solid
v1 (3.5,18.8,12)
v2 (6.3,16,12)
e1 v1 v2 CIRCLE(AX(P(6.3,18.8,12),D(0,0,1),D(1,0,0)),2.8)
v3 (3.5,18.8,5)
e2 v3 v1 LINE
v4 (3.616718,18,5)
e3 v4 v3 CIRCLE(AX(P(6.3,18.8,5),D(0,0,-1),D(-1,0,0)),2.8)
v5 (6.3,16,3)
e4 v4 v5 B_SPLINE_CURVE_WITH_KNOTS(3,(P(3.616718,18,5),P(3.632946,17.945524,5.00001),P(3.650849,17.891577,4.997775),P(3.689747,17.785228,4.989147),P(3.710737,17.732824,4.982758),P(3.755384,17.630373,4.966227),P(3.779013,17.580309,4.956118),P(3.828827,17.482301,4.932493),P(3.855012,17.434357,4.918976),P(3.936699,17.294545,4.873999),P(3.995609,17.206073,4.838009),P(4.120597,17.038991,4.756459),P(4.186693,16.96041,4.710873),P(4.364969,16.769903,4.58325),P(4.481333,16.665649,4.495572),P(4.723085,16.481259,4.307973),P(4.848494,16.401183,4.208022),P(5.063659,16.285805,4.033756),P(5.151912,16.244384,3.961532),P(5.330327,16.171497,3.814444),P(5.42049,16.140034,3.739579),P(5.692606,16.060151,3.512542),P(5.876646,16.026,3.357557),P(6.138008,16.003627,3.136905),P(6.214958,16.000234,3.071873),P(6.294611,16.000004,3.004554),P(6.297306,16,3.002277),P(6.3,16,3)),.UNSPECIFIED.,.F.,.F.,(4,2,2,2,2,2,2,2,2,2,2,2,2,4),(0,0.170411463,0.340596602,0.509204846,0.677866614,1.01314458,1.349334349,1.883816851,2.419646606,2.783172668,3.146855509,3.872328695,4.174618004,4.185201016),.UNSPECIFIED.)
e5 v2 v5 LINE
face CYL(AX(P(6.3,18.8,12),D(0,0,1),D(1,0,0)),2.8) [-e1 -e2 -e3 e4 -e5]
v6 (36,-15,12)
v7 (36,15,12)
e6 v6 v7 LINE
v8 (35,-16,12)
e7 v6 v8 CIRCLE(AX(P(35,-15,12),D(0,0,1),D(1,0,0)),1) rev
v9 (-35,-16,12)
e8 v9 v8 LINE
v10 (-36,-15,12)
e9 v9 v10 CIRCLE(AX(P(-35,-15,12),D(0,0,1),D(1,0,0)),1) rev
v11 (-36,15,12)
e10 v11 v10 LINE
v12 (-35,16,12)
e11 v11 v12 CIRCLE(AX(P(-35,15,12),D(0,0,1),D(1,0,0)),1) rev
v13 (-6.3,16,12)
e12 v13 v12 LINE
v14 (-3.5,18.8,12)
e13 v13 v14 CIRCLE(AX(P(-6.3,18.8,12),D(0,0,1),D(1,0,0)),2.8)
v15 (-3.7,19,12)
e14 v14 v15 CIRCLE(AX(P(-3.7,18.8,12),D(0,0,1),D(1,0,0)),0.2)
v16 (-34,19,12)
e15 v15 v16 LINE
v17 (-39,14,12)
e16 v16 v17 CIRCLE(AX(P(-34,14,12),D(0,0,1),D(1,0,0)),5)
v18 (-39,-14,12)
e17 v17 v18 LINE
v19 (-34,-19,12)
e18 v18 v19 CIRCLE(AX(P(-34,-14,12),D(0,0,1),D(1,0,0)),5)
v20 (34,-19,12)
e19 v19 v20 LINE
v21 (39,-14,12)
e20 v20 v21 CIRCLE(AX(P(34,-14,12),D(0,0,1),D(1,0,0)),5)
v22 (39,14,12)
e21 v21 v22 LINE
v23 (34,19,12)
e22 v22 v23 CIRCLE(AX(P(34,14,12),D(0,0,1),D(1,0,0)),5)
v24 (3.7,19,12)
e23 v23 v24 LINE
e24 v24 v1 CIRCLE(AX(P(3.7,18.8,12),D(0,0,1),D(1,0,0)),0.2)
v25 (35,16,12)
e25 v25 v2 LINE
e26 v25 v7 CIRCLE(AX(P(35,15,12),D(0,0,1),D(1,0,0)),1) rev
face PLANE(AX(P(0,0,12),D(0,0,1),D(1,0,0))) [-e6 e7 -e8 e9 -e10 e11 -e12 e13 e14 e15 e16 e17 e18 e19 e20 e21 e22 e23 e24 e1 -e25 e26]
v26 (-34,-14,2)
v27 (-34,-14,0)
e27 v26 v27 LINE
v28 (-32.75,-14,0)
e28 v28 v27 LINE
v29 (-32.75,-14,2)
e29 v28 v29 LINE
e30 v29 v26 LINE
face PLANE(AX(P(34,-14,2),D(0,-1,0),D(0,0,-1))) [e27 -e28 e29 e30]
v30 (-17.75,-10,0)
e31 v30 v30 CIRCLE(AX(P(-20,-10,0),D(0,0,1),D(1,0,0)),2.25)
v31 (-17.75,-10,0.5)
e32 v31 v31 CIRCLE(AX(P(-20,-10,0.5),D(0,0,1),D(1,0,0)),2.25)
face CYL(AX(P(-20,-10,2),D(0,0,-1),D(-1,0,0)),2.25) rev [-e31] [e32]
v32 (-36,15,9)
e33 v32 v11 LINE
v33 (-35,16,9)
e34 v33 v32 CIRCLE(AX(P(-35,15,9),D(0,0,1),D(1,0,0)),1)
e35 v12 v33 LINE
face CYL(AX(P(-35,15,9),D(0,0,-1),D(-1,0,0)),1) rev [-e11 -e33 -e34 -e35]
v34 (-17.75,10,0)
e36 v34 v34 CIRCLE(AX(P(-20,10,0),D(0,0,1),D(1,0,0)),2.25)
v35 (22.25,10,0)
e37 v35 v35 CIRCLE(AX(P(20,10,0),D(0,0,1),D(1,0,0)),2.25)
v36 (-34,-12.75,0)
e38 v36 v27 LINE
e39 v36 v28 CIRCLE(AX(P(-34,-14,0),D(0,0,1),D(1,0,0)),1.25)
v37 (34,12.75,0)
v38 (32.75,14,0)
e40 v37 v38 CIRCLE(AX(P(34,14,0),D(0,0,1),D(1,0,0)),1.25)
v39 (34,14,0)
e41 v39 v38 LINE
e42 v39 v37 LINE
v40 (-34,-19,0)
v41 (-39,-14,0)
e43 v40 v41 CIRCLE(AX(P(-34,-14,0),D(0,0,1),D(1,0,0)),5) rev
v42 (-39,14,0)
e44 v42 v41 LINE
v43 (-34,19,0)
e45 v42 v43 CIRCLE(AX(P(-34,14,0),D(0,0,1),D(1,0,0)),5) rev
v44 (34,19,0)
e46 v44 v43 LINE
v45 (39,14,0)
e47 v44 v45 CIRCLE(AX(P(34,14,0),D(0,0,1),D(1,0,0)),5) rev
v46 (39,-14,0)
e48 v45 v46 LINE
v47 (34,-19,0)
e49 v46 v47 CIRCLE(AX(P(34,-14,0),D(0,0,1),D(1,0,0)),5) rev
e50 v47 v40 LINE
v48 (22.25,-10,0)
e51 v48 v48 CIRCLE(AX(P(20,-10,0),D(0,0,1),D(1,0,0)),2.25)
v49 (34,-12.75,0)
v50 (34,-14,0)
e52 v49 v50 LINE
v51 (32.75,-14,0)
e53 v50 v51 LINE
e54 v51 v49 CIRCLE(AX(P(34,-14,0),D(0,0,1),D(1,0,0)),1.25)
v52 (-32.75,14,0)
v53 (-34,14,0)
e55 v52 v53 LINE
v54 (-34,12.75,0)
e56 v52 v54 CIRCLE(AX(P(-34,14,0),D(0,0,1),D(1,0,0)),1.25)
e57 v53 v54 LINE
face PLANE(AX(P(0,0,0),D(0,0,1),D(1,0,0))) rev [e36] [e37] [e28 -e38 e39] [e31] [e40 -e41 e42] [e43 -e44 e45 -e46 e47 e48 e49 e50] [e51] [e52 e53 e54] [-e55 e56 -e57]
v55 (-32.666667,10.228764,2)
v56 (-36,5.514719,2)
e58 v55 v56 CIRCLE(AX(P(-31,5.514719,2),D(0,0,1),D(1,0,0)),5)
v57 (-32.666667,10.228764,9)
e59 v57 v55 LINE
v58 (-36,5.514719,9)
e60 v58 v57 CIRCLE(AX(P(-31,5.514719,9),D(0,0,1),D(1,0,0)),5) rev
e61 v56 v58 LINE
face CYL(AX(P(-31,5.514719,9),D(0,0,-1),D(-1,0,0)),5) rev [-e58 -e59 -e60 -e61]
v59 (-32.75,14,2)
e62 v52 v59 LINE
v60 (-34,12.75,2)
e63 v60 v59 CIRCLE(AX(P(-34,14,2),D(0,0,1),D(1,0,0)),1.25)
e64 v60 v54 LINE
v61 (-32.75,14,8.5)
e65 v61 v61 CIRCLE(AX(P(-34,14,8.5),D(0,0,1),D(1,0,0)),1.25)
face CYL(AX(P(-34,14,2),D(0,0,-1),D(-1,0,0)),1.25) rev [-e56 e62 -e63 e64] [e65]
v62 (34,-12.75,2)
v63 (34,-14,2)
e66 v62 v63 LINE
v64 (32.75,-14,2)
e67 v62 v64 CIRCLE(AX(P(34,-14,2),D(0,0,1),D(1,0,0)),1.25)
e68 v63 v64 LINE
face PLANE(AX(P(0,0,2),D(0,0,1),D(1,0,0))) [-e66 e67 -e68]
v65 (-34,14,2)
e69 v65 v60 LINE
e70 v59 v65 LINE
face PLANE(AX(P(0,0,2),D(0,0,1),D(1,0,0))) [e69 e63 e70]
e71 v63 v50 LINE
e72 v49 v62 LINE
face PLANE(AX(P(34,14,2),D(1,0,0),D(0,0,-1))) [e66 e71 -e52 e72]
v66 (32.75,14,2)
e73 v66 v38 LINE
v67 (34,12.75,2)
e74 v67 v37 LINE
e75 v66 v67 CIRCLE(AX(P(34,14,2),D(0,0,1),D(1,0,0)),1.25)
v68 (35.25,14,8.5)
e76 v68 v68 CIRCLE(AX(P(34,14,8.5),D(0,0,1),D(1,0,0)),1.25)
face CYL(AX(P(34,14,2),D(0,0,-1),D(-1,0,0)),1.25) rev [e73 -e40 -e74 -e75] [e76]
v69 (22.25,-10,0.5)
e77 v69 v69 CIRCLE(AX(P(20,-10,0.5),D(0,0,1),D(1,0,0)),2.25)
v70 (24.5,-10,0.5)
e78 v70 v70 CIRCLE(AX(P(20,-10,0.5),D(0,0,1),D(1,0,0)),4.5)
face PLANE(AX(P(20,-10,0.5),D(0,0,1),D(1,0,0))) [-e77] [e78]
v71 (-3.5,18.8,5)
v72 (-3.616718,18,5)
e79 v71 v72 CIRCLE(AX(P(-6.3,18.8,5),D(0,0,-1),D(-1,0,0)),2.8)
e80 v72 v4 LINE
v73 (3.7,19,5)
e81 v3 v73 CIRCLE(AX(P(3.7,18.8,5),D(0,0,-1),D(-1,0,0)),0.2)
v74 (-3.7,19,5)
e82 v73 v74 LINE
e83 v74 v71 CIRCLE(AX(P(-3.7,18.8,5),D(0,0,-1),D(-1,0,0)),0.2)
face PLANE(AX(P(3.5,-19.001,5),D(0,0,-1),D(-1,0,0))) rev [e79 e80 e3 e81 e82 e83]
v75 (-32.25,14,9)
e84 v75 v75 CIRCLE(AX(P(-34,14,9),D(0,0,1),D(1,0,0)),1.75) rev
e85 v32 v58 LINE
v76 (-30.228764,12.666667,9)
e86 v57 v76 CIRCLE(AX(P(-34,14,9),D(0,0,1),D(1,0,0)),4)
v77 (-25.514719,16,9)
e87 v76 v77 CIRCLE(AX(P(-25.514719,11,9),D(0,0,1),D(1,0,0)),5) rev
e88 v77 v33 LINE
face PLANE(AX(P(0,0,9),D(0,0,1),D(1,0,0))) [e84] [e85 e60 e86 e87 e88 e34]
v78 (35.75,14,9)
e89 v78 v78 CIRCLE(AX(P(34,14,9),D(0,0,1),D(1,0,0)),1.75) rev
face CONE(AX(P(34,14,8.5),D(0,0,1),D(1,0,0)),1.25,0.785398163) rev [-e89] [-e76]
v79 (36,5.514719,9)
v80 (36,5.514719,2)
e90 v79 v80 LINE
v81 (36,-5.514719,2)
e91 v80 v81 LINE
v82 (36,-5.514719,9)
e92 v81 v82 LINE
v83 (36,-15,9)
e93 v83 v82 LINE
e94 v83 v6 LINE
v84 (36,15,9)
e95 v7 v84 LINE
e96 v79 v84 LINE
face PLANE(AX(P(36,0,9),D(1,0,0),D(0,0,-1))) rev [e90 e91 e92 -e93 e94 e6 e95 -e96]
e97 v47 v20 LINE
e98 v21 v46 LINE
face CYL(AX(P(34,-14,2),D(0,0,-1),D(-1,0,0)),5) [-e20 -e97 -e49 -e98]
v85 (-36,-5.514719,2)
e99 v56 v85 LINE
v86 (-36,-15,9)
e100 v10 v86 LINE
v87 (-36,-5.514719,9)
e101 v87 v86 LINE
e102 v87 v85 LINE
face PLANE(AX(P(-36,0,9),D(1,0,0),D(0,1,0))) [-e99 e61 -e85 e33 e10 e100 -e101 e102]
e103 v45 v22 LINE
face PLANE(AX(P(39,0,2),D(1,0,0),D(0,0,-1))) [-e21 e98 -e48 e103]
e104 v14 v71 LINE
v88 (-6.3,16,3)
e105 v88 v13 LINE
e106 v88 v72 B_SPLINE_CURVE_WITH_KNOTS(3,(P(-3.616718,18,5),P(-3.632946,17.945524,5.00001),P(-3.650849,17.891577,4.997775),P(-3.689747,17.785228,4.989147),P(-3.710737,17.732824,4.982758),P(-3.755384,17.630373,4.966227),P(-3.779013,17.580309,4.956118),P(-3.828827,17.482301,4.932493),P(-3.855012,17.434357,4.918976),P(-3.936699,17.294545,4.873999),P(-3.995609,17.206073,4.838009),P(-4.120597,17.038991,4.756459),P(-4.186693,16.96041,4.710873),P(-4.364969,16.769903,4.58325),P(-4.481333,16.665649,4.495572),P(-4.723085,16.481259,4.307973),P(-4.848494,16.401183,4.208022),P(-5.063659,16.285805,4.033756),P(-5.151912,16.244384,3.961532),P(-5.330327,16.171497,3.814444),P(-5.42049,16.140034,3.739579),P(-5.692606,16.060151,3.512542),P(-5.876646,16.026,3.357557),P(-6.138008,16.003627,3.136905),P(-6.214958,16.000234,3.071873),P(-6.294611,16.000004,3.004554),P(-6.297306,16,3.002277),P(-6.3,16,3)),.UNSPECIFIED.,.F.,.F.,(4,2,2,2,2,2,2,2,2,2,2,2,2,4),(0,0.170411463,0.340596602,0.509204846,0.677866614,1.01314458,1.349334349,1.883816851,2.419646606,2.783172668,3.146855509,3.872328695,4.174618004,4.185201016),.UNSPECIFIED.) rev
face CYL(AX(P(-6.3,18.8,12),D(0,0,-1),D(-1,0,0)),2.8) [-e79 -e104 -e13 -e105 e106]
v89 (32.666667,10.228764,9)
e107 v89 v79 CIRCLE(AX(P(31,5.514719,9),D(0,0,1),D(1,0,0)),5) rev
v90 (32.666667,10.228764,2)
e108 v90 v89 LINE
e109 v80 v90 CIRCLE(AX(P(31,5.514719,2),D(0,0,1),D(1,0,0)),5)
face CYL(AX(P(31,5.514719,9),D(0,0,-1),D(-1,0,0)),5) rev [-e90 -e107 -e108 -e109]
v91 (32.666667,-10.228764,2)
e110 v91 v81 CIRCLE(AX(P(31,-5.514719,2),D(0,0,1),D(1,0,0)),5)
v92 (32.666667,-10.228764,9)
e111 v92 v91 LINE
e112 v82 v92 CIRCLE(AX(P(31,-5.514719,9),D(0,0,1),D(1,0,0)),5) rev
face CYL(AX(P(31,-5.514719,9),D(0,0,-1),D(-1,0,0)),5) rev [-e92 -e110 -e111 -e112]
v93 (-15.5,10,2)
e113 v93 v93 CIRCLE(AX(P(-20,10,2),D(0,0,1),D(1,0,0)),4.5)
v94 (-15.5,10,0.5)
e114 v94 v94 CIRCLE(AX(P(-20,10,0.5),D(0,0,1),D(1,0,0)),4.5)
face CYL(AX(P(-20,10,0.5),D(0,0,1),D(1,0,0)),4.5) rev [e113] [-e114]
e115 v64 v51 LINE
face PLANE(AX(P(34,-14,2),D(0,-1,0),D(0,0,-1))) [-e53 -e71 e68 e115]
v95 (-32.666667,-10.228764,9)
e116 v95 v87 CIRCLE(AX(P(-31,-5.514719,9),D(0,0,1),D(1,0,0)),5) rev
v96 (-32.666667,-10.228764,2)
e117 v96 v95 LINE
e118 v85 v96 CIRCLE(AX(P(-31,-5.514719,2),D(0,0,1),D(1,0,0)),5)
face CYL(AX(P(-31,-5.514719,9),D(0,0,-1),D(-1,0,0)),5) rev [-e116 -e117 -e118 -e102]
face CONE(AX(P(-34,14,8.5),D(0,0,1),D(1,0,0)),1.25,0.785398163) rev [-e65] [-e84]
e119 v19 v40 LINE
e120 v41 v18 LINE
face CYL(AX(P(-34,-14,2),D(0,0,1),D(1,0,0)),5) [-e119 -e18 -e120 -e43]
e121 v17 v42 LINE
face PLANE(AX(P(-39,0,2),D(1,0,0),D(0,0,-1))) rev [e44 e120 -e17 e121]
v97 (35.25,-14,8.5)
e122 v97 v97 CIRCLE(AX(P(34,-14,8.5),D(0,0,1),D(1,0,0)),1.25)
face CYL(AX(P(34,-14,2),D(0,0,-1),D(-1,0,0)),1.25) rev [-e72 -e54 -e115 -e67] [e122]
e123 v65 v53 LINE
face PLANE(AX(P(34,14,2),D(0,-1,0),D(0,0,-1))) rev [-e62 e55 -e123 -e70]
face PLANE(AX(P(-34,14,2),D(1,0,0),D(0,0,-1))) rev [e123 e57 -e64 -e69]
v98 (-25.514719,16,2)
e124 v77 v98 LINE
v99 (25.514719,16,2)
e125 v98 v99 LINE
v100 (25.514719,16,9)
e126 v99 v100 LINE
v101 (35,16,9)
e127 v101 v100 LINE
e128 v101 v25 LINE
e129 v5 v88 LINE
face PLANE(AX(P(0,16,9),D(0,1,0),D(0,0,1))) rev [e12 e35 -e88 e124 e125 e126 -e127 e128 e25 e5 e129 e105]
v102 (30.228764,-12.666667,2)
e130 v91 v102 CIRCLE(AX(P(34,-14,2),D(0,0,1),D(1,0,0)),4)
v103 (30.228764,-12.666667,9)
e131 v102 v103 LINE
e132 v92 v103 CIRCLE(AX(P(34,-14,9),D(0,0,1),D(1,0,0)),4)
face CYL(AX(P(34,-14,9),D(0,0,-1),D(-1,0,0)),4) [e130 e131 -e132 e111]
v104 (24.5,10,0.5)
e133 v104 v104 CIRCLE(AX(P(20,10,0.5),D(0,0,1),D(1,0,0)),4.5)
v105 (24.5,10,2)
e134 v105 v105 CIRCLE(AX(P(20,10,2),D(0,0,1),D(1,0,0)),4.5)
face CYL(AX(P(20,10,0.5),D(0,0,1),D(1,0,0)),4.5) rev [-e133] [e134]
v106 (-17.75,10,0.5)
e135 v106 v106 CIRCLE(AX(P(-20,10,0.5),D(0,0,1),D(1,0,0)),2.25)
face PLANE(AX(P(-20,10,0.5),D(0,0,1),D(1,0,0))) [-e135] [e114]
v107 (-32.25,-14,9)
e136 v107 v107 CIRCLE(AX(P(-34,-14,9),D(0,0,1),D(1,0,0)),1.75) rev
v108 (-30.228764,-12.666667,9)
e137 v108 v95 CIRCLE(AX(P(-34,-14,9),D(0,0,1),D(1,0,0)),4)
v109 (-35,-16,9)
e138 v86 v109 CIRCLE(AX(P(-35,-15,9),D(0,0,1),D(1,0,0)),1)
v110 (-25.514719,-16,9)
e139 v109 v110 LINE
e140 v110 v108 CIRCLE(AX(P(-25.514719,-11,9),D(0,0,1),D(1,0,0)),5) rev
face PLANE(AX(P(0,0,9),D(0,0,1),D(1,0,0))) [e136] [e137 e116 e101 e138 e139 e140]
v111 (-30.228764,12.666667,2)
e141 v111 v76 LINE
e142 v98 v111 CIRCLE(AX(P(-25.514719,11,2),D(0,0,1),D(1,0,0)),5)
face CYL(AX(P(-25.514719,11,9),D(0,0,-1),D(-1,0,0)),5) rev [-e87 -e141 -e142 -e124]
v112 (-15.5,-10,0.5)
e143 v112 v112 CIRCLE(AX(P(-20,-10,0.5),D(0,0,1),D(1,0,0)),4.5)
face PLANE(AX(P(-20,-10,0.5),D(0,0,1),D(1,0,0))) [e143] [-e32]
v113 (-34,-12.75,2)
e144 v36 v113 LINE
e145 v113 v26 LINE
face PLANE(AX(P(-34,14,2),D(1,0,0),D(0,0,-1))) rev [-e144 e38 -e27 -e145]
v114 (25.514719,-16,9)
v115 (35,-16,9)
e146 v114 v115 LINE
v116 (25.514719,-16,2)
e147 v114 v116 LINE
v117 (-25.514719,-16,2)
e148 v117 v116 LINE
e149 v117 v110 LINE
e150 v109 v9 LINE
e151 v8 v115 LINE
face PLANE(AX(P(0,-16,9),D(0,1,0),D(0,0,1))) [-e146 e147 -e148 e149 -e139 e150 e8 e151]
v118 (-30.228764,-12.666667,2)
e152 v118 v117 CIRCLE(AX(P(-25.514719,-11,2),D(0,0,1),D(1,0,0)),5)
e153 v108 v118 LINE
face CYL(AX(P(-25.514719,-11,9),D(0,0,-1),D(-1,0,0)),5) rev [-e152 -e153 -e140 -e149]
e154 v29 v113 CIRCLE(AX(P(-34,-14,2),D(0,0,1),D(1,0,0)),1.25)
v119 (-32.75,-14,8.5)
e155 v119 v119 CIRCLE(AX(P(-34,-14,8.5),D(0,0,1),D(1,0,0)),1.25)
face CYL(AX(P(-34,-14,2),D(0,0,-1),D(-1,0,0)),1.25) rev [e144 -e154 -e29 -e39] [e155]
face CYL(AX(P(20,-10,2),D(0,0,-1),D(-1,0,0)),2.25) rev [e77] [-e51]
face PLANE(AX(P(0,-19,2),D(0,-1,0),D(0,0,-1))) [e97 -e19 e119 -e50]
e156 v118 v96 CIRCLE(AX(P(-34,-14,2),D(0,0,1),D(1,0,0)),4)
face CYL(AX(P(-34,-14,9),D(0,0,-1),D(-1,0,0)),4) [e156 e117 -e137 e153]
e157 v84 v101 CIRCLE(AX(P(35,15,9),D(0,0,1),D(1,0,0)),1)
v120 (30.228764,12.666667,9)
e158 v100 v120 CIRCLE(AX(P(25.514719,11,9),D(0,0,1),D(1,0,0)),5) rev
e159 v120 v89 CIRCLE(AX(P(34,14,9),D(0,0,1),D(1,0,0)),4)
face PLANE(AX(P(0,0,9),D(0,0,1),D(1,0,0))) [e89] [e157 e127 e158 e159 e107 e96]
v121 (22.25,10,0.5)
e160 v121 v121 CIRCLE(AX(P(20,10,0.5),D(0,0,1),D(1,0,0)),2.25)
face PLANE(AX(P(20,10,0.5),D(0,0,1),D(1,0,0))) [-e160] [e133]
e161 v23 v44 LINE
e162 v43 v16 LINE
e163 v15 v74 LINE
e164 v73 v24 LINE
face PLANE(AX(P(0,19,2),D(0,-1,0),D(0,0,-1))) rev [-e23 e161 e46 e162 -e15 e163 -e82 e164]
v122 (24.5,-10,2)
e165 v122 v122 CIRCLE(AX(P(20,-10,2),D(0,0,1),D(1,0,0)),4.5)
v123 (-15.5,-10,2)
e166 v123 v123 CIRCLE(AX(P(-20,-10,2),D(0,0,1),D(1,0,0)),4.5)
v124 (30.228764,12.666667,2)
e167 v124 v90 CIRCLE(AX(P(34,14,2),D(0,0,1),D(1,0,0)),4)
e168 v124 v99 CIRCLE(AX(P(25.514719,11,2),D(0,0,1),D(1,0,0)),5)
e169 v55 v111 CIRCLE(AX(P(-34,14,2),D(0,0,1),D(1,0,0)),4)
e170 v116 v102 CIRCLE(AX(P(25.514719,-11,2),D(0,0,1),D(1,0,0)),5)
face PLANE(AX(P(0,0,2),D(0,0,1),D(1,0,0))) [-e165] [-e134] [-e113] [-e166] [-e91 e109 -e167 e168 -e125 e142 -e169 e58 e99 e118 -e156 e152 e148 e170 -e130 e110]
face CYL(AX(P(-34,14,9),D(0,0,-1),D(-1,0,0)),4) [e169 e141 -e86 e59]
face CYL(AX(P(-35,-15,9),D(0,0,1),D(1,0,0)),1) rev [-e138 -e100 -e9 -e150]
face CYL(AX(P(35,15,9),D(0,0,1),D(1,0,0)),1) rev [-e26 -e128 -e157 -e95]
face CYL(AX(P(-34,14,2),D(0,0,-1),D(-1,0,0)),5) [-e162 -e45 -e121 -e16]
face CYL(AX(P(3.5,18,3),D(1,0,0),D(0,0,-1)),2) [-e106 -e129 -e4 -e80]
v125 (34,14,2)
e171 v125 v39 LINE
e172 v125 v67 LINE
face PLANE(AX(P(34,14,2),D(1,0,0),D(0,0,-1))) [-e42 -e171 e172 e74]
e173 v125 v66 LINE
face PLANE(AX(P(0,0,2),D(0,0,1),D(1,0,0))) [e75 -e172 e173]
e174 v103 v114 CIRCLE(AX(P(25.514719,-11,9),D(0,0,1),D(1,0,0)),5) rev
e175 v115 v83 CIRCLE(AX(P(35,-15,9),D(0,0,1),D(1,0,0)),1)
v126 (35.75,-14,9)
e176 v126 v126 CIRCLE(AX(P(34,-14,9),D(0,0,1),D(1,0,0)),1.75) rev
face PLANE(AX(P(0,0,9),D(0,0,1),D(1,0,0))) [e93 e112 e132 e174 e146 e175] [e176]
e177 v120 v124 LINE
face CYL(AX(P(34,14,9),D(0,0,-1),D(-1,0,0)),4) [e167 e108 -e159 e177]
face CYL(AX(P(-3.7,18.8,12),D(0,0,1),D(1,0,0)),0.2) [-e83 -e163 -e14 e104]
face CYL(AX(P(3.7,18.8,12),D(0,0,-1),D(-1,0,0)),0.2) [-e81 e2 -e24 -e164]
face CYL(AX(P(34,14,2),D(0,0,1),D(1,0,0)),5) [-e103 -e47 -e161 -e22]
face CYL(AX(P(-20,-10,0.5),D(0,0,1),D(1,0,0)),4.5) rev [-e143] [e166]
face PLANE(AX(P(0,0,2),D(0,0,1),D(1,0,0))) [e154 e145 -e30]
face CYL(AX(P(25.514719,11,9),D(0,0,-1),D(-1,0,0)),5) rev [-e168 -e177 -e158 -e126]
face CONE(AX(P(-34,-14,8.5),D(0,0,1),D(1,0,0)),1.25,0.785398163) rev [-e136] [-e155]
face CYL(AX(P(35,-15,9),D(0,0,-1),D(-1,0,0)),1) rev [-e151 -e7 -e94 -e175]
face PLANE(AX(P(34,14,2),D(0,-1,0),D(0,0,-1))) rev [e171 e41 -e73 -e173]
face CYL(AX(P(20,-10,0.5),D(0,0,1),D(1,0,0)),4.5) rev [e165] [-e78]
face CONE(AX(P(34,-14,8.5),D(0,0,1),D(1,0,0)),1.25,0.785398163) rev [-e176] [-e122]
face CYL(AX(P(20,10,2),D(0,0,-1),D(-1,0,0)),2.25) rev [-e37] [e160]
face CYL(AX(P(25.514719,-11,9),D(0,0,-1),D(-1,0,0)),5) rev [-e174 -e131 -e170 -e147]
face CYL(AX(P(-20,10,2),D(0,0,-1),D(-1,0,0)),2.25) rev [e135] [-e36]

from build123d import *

# Parameters (mm, degrees)
SCHIZZO1_W                   = 78
SCHIZZO1_H                   = 38
SCHIZZO1_R                   = 2.25
ESTRUSIONE_ESTRUSIONE1_DEPTH = 2
SCHIZZO2_W                   = 78
SCHIZZO2_H                   = 38
SCHIZZO2_R                   = 1.25
ESTRUSIONE_ESTRUSIONE2_DEPTH = 7
SCHIZZO3_W                   = 78
SCHIZZO3_H                   = 38
SCHIZZO3_W_2                 = 72
SCHIZZO3_H_2                 = 32
ESTRUSIONE_ESTRUSIONE3_DEPTH = 3
SMUSSO1_SIZE                 = 0.5
RACCORDO1_R                  = 5
SCHIZZO4_R                   = 4.5
TAGLIO_ESTRUSIONE1_DEPTH     = 1.5
RACCORDO2_R                  = 5
RACCORDO3_R                  = 1
TAGLIO_ESTRUSIONE2_REACH     = 57.758
SCHIZZO5_W                   = 7
SCHIZZO5_H                   = 7
RACCORDO4_R                  = 2.8
RACCORDO5_R                  = 0.2
RACCORDO6_R                  = 2


with BuildPart() as part:
    # Schizzo1 → Estrusione-Estrusione1 (new body)
    with BuildSketch(Plane.XY):
        Rectangle(SCHIZZO1_W, SCHIZZO1_H)
        with BuildLine():
            ThreePointArc((-34, 12.75), (-34.883883476, 14.883883476), (-32.75, 14))
            Line((-32.75, 14), (-34, 14))
            Line((-34, 14), (-34, 12.75))
        make_face(mode=Mode.SUBTRACT)
        with BuildLine():
            ThreePointArc((32.75, 14), (34.883883476, 14.883883476), (34, 12.75))
            Line((34, 12.75), (34, 14))
            Line((34, 14), (32.75, 14))
        make_face(mode=Mode.SUBTRACT)
        with BuildLine():
            ThreePointArc((34, -12.75), (34.883883476, -14.883883476), (32.75, -14))
            Line((32.75, -14), (34, -14))
            Line((34, -14), (34, -12.75))
        make_face(mode=Mode.SUBTRACT)
        with BuildLine():
            ThreePointArc((-32.75, -14), (-34.883883476, -14.883883476), (-34, -12.75))
            Line((-34, -12.75), (-34, -14))
            Line((-34, -14), (-32.75, -14))
        make_face(mode=Mode.SUBTRACT)
        with Locations((20, 10)):
            Circle(SCHIZZO1_R, mode=Mode.SUBTRACT)
        with Locations((-20, 10)):
            Circle(SCHIZZO1_R, mode=Mode.SUBTRACT)
        with Locations((20, -10)):
            Circle(SCHIZZO1_R, mode=Mode.SUBTRACT)
        with Locations((-20, -10)):
            Circle(SCHIZZO1_R, mode=Mode.SUBTRACT)
    extrude(amount=ESTRUSIONE_ESTRUSIONE1_DEPTH)

    # Schizzo2 → Estrusione-Estrusione2 (add)
    with BuildSketch(Plane.XY.offset(2)):
        Rectangle(SCHIZZO2_W, SCHIZZO2_H)
        with BuildLine():
            ThreePointArc((-36, 10.535898385), (-31.171572875, 11.171572875), (-30.535898385, 16))
            Line((-30.535898385, 16), (30.535898385, 16))
            ThreePointArc((30.535898385, 16), (31.171572875, 11.171572875), (36, 10.535898385))
            Line((36, 10.535898385), (36, -10.535898385))
            ThreePointArc((36, -10.535898385), (31.171572875, -11.171572875), (30.535898385, -16))
            Line((30.535898385, -16), (-30.535898385, -16))
            ThreePointArc((-30.535898385, -16), (-31.171572875, -11.171572875), (-36, -10.535898385))
            Line((-36, -10.535898385), (-36, 10.535898385))
        make_face(mode=Mode.SUBTRACT)
        with Locations((-34, 14)):
            Circle(SCHIZZO2_R, mode=Mode.SUBTRACT)
        with Locations((-34, -14)):
            Circle(SCHIZZO2_R, mode=Mode.SUBTRACT)
        with Locations(Location((34, -14, 0), (0, 0, 180))):
            Circle(SCHIZZO2_R, mode=Mode.SUBTRACT)
        with Locations(Location((34, 14, 0), (0, 0, 180))):
            Circle(SCHIZZO2_R, mode=Mode.SUBTRACT)
    extrude(amount=ESTRUSIONE_ESTRUSIONE2_DEPTH)

    # Schizzo3 → Estrusione-Estrusione3 (add)
    with BuildSketch(Plane.XY.offset(9)):
        Rectangle(SCHIZZO3_W, SCHIZZO3_H)
        Rectangle(SCHIZZO3_W_2, SCHIZZO3_H_2, mode=Mode.SUBTRACT)
    extrude(amount=ESTRUSIONE_ESTRUSIONE3_DEPTH)

    # Smusso1
    smusso1_edges = [part.edges().sort_by_distance(p)[0] for p in [
        (35.25, -14, 9),
        (-35.25, -14, 9),
        (-35.25, 14, 9),
        (35.25, 14, 9),
    ]]
    chamfer(smusso1_edges, length=SMUSSO1_SIZE)

    # Raccordo1
    raccordo1_edges = [part.edges().sort_by_distance(p)[0] for p in [
        (39, 19, 6),
        (39, -19, 6),
        (-39, -19, 6),
        (-39, 19, 6),
    ]]
    fillet(raccordo1_edges, radius=RACCORDO1_R)

    # Schizzo4 → Taglio-Estrusione1 (cut)
    with BuildSketch(Plane.XY.offset(2)):
        with Locations((-20, 10)):
            Circle(SCHIZZO4_R)
        with Locations((20, 10)):
            Circle(SCHIZZO4_R)
        with Locations((20, -10)):
            Circle(SCHIZZO4_R)
        with Locations((-20, -10)):
            Circle(SCHIZZO4_R)
    extrude(amount=-TAGLIO_ESTRUSIONE1_DEPTH, mode=Mode.SUBTRACT)

    # Raccordo2
    raccordo2_edges = [part.edges().sort_by_distance(p)[0] for p in [
        (30.535898385, 16, 5.5),
        (36, 10.535898385, 5.5),
        (36, -10.535898385, 5.5),
        (30.535898385, -16, 5.5),
        (-30.535898385, -16, 5.5),
        (-36, -10.535898385, 5.5),
        (-36, 10.535898385, 5.5),
        (-30.535898385, 16, 5.5),
    ]]
    fillet(raccordo2_edges, radius=RACCORDO2_R)

    # Raccordo3
    raccordo3_edges = [part.edges().sort_by_distance(p)[0] for p in [
        (-36, 16, 10.5),
        (-36, -16, 10.5),
        (36, -16, 10.5),
        (36, 16, 10.5),
    ]]
    fillet(raccordo3_edges, radius=RACCORDO3_R)

    # Schizzo5 → Taglio-Estrusione2 (cut, up to next)
    with BuildSketch(Plane(origin=(0, 19, 0), x_dir=(1, 0, 0), z_dir=(0, 1, 0)), mode=Mode.PRIVATE) as taglio_estrusione2_sk1:
        with Locations((0, -8.5)):
            Rectangle(SCHIZZO5_W, SCHIZZO5_H)
    taglio_estrusione2_tool1 = extrude(taglio_estrusione2_sk1.sketch, amount=-TAGLIO_ESTRUSIONE2_REACH, mode=Mode.PRIVATE) & part.part
    add(taglio_estrusione2_tool1.solids().sort_by_distance((0, 19, 8.5))[0], mode=Mode.SUBTRACT)

    # Raccordo4
    raccordo4_edges = [part.edges().sort_by_distance(p)[0] for p in [
        (3.5, 16, 8.5),
        (-3.5, 16, 8.5),
    ]]
    fillet(raccordo4_edges, radius=RACCORDO4_R)

    # Raccordo5
    raccordo5_edges = [part.edges().sort_by_distance(p)[0] for p in [
        (-3.5, 19, 8.5),
        (3.5, 19, 8.5),
    ]]
    fillet(raccordo5_edges, radius=RACCORDO5_R - 0.0001)  # a hair under: the kernel refuses the full size

    # Raccordo6
    raccordo6_edges = [part.edges().sort_by_distance(p)[0] for p in [
        (0, 16, 5),
    ]]
    fillet(raccordo6_edges, radius=RACCORDO6_R)


solid = part.part
